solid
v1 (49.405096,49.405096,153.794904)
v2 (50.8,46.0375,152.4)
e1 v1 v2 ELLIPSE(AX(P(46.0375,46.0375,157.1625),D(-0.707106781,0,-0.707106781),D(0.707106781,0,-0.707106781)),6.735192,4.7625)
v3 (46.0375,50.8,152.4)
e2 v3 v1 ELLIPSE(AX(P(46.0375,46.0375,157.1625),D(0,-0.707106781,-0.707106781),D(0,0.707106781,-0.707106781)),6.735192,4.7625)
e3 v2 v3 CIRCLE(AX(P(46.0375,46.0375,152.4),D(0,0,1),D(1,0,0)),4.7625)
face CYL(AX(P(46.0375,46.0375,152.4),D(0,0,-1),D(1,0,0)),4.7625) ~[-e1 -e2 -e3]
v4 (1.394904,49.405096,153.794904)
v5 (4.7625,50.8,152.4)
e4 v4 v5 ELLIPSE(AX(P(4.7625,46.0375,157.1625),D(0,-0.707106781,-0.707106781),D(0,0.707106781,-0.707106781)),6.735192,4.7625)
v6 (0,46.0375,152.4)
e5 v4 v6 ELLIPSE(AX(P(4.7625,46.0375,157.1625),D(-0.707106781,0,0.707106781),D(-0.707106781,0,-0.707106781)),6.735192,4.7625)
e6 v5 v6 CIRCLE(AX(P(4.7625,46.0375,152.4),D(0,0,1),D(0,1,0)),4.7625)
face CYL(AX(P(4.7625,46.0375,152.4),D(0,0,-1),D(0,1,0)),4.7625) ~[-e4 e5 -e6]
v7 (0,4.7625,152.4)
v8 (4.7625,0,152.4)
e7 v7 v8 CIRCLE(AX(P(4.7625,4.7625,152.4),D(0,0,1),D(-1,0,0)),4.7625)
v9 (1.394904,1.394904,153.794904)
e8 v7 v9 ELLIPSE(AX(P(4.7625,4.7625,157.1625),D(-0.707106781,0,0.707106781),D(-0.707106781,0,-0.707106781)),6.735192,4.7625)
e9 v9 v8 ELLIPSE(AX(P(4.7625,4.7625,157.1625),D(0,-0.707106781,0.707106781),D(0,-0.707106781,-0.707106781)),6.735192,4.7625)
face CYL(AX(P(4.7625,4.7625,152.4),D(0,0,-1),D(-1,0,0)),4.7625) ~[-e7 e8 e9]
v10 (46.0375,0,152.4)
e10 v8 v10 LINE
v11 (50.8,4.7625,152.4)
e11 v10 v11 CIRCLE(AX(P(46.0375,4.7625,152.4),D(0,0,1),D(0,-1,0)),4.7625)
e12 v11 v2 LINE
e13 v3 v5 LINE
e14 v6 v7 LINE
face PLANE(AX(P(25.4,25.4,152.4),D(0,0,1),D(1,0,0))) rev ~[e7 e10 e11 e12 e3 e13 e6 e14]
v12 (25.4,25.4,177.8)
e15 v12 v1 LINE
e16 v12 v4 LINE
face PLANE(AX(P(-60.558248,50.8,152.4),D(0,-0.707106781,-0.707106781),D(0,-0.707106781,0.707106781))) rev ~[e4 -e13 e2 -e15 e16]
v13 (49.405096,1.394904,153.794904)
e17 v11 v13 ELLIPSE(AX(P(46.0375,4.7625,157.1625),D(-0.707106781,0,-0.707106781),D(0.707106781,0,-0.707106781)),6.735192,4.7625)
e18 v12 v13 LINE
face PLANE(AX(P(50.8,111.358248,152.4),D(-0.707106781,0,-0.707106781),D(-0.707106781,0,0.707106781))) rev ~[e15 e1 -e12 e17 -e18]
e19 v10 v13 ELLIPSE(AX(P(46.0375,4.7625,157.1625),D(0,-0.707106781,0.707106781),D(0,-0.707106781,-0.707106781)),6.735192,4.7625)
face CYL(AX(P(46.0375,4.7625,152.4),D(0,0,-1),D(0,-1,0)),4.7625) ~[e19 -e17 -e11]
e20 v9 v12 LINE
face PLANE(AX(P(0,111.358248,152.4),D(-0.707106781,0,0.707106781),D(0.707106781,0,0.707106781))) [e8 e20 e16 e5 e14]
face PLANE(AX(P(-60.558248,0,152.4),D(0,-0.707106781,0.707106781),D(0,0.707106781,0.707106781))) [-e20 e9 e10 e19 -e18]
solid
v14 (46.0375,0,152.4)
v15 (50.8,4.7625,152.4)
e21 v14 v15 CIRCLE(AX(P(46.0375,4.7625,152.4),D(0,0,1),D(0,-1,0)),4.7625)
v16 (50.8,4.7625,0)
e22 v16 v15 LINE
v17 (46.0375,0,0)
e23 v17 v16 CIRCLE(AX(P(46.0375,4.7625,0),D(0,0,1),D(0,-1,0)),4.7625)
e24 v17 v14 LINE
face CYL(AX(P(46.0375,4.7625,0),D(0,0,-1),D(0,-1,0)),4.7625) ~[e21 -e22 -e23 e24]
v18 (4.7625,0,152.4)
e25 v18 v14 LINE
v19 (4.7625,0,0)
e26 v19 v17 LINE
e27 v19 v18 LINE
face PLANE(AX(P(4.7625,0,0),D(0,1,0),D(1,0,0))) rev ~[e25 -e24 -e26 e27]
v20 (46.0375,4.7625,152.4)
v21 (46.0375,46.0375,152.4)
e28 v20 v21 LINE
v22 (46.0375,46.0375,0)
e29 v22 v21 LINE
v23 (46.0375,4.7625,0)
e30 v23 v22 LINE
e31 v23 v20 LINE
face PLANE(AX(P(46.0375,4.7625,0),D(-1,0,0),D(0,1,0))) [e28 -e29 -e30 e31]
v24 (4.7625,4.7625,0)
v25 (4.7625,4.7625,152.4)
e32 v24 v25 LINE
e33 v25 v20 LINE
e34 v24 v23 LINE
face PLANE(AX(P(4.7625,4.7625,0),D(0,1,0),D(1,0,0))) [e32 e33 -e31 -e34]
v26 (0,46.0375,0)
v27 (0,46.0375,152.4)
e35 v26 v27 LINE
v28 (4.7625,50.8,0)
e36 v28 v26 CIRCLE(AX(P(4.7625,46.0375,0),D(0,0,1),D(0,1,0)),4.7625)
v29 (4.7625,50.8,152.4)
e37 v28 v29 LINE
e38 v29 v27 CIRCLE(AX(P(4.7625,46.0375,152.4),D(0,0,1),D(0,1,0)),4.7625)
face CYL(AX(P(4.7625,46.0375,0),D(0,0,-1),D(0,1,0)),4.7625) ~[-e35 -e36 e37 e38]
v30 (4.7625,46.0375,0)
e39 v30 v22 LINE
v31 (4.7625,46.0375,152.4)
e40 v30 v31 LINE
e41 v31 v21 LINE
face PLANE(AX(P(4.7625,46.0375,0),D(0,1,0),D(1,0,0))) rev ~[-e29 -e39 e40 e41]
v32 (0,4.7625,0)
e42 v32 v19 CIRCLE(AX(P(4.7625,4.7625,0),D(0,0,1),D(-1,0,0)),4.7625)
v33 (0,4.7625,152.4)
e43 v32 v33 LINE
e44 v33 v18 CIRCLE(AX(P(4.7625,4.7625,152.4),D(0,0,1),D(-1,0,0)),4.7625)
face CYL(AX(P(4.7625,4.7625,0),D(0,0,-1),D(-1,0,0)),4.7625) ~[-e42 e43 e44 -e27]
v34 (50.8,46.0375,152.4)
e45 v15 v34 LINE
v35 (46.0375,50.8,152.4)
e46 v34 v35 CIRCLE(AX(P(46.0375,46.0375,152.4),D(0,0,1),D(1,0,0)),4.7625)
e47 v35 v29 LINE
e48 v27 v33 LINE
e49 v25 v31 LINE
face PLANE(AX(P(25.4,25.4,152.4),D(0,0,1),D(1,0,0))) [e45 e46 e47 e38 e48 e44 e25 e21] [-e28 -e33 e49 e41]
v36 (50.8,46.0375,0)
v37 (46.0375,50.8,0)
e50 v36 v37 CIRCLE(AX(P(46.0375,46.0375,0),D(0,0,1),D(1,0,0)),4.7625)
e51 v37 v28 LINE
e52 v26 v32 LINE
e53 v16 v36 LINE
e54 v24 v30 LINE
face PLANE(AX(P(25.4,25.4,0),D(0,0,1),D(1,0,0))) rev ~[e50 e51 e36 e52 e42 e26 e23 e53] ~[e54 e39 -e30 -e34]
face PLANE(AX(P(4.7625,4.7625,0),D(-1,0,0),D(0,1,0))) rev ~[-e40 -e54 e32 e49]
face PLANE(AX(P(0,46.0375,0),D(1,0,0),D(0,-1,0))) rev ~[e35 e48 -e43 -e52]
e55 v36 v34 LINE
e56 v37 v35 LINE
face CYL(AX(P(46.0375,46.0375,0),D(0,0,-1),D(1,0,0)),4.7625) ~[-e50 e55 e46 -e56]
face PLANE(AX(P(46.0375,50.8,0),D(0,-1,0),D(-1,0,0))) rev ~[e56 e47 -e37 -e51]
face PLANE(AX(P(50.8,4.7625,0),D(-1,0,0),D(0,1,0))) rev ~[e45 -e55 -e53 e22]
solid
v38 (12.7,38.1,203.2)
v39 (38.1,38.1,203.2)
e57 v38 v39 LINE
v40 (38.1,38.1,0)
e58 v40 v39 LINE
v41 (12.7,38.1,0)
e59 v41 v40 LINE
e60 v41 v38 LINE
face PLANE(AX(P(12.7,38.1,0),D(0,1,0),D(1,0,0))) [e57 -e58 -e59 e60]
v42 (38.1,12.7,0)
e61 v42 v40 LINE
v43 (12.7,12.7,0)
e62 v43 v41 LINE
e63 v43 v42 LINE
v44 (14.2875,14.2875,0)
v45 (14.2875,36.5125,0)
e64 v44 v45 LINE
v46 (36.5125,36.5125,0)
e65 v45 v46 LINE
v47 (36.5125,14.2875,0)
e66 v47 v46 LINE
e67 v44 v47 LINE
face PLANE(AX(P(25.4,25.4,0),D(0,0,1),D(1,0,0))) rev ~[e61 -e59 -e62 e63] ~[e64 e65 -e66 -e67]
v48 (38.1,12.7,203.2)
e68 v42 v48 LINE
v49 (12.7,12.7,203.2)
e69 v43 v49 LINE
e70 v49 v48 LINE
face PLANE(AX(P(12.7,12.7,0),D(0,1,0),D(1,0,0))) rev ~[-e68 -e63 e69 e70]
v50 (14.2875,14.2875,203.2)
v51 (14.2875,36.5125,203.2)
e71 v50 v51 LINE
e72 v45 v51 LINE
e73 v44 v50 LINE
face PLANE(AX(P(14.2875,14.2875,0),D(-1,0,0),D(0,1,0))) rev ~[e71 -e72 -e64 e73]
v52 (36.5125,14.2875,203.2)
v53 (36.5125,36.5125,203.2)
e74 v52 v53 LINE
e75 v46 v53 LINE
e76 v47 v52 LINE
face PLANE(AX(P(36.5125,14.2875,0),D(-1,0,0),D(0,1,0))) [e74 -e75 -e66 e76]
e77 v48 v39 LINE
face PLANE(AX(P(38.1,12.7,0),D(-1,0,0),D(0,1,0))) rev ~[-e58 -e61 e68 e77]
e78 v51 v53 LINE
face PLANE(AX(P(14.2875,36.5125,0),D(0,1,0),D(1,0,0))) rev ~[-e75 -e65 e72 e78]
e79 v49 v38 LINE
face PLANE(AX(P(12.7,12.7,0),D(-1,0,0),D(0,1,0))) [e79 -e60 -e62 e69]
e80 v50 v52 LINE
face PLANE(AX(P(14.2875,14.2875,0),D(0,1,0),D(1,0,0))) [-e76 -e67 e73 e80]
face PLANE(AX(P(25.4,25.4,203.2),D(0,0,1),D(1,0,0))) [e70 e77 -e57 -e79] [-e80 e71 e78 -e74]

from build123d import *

# Parameters (mm, degrees)
F0_W         = 41.275
F0_H         = 41.275
F1_DEPTH     = 152.4
F3_W         = 41.275
F3_H         = 41.275
F4_DEPTH     = 25.4
F5_T1_DEPTH  = 171.9164957887
F5_T3_DEPTH  = 171.9164957887
F5_T8_ANGLE  = 90
F5_T13_ANGLE = 90
F5_T18_ANGLE = 90
F5_T23_ANGLE = 90
F5_T28_ANGLE = 90
F5_T33_ANGLE = 90
F5_T38_ANGLE = 90
F5_T43_ANGLE = 90
F2_W         = 25.4
F2_H         = 25.4
F2_W_2       = 22.225
F2_H_2       = 22.225
F6_DEPTH     = 203.2


# Not quite as in the source:
# - a fillet or chamfer that OpenCascade refuses, or shapes differently, is made with other operations: its cross-section is extruded or revolved along the edge and cut away or added


with BuildPart() as f1:
    # F0 (on Top) → F1 (new body)
    with BuildSketch(Plane.XY):
        with BuildLine():
            ThreePointArc((0, 4.7625), (1.3949039546, 1.3949039546), (4.7625, 0))
            Line((4.7625, 0), (46.0375, 0))
            ThreePointArc((46.0375, 0), (49.4050960454, 1.3949039546), (50.8, 4.7625))
            Line((50.8, 4.7625), (50.8, 46.0375))
            ThreePointArc((50.8, 46.0375), (49.4050960454, 49.4050960454), (46.0375, 50.8))
            Line((46.0375, 50.8), (4.7625, 50.8))
            ThreePointArc((4.7625, 50.8), (1.3949039546, 49.4050960454), (0, 46.0375))
            Line((0, 46.0375), (0, 4.7625))
        make_face()
        with Locations((25.4, 25.4)):
            Rectangle(F0_W, F0_H, mode=Mode.SUBTRACT)
    extrude(amount=F1_DEPTH)


with BuildPart() as f4:
    # F3 (on face) → F4 (new body)
    with BuildSketch(Plane.XY.offset(152.4)):
        with BuildLine():
            ThreePointArc((0, 4.7625), (1.3949039546, 1.3949039546), (4.7625, 0))
            Line((4.7625, 0), (46.0375, 0))
            ThreePointArc((46.0375, 0), (49.4050960454, 1.3949039546), (50.8, 4.7625))
            Line((50.8, 4.7625), (50.8, 46.0375))
            ThreePointArc((50.8, 46.0375), (49.4050960454, 49.4050960454), (46.0375, 50.8))
            Line((46.0375, 50.8), (4.7625, 50.8))
            ThreePointArc((4.7625, 50.8), (1.3949039546, 49.4050960454), (0, 46.0375))
            Line((0, 46.0375), (0, 4.7625))
        make_face()
        with Locations((25.4, 25.4)):
            Rectangle(F3_W, F3_H, mode=Mode.SUBTRACT)
        with Locations((25.4, 25.4)):
            Rectangle(F3_W, F3_H)
    extrude(amount=F4_DEPTH)

    # F5: chamfer of 25.4 on 4 edges, made by hand

    # F5_s2 → F5_t1 (cut)
    with BuildSketch(Plane.XZ.offset(-111.3582478943)):
        Polygon((50.8, 152.4), (25.4, 177.8), (50.8, 177.8), align=None)
        Polygon((0, 152.4), (25.4, 177.8), (0, 177.8), align=None)
    extrude(amount=F5_T1_DEPTH, mode=Mode.SUBTRACT)

    # F5_s4 → F5_t3 (cut)
    with BuildSketch(Plane.YZ.offset(-60.5582478943)):
        Polygon((50.8, 152.4), (25.4, 177.8), (50.8, 177.8), align=None)
        Polygon((0, 152.4), (25.4, 177.8), (0, 177.8), align=None)
    extrude(amount=F5_T3_DEPTH, mode=Mode.SUBTRACT)


with BuildPart() as f5_tool6:
    # F5_s7 → F5_t8 (revolve)
    with BuildSketch(Plane.YZ.offset(4.7625)):
        Polygon((50.8, 152.4), (46.0375, 157.1625), (46.0375, 177.8), (50.8, 177.8), align=None)
    revolve(axis=Axis((4.7625, 46.0375, 177.8), (0, 0, 1)), revolution_arc=F5_T8_ANGLE)

    split(bisect_by=Plane(origin=(0, 101.6, 101.6), x_dir=(1, 0, 0), z_dir=(0, 0.7071067812, 0.7071067812)), keep=Keep.TOP)


with BuildPart() as f4_1:
    add(f4.part)

    # F5_t5: cut F5_tool6
    add(f5_tool6.part, mode=Mode.SUBTRACT)


with BuildPart() as f5_tool11:
    # F5_s12 → F5_t13 (revolve)
    with BuildSketch(Plane.YZ.offset(4.7625)):
        Polygon((50.8, 152.4), (46.0375, 157.1625), (46.0375, 177.8), (50.8, 177.8), align=None)
    revolve(axis=Axis((4.7625, 46.0375, 177.8), (0, 0, 1)), revolution_arc=F5_T13_ANGLE)

    split(bisect_by=Plane(origin=(-76.2, 0, 76.2), x_dir=(0, 1, 0), z_dir=(-0.7071067812, 0, 0.7071067812)), keep=Keep.TOP)


with BuildPart() as f4_2:
    add(f4_1.part)

    # F5_t10: cut F5_tool11
    add(f5_tool11.part, mode=Mode.SUBTRACT)


with BuildPart() as f5_tool16:
    # F5_s17 → F5_t18 (revolve)
    with BuildSketch(Plane.XZ.offset(-4.7625)):
        Polygon((0, 152.4), (4.7625, 157.1625), (4.7625, 177.8), (0, 177.8), align=None)
    revolve(axis=Axis((4.7625, 4.7625, 177.8), (0, 0, 1)), revolution_arc=F5_T18_ANGLE)

    split(bisect_by=Plane(origin=(-76.2, 0, 76.2), x_dir=(0, 1, 0), z_dir=(-0.7071067812, 0, 0.7071067812)), keep=Keep.TOP)


with BuildPart() as f4_3:
    add(f4_2.part)

    # F5_t15: cut F5_tool16
    add(f5_tool16.part, mode=Mode.SUBTRACT)


with BuildPart() as f5_tool21:
    # F5_s22 → F5_t23 (revolve)
    with BuildSketch(Plane.XZ.offset(-4.7625)):
        Polygon((0, 152.4), (4.7625, 157.1625), (4.7625, 177.8), (0, 177.8), align=None)
    revolve(axis=Axis((4.7625, 4.7625, 177.8), (0, 0, 1)), revolution_arc=F5_T23_ANGLE)

    split(bisect_by=Plane(origin=(0, -76.2, 76.2), x_dir=(1, 0, 0), z_dir=(0, -0.7071067812, 0.7071067812)), keep=Keep.TOP)


with BuildPart() as f4_4:
    add(f4_3.part)

    # F5_t20: cut F5_tool21
    add(f5_tool21.part, mode=Mode.SUBTRACT)


with BuildPart() as f5_tool26:
    # F5_s27 → F5_t28 (revolve)
    with BuildSketch(Plane.YZ.offset(46.0375)):
        Polygon((0, 152.4), (4.7625, 157.1625), (4.7625, 177.8), (0, 177.8), align=None)
    revolve(axis=Axis((46.0375, 4.7625, 177.8), (0, 0, 1)), revolution_arc=F5_T28_ANGLE)

    split(bisect_by=Plane(origin=(0, -76.2, 76.2), x_dir=(1, 0, 0), z_dir=(0, -0.7071067812, 0.7071067812)), keep=Keep.TOP)


with BuildPart() as f4_5:
    add(f4_4.part)

    # F5_t25: cut F5_tool26
    add(f5_tool26.part, mode=Mode.SUBTRACT)


with BuildPart() as f5_tool31:
    # F5_s32 → F5_t33 (revolve)
    with BuildSketch(Plane.YZ.offset(46.0375)):
        Polygon((0, 152.4), (4.7625, 157.1625), (4.7625, 177.8), (0, 177.8), align=None)
    revolve(axis=Axis((46.0375, 4.7625, 177.8), (0, 0, 1)), revolution_arc=F5_T33_ANGLE)

    split(bisect_by=Plane(origin=(101.6, 0, 101.6), x_dir=(0, 1, 0), z_dir=(0.7071067812, 0, 0.7071067812)), keep=Keep.TOP)


with BuildPart() as f4_6:
    add(f4_5.part)

    # F5_t30: cut F5_tool31
    add(f5_tool31.part, mode=Mode.SUBTRACT)


with BuildPart() as f5_tool36:
    # F5_s37 → F5_t38 (revolve)
    with BuildSketch(Plane.XZ.offset(-46.0375)):
        Polygon((50.8, 152.4), (46.0375, 157.1625), (46.0375, 177.8), (50.8, 177.8), align=None)
    revolve(axis=Axis((46.0375, 46.0375, 177.8), (0, 0, 1)), revolution_arc=F5_T38_ANGLE)

    split(bisect_by=Plane(origin=(101.6, 0, 101.6), x_dir=(0, 1, 0), z_dir=(0.7071067812, 0, 0.7071067812)), keep=Keep.TOP)


with BuildPart() as f4_7:
    add(f4_6.part)

    # F5_t35: cut F5_tool36
    add(f5_tool36.part, mode=Mode.SUBTRACT)


with BuildPart() as f5_tool41:
    # F5_s42 → F5_t43 (revolve)
    with BuildSketch(Plane.XZ.offset(-46.0375)):
        Polygon((50.8, 152.4), (46.0375, 157.1625), (46.0375, 177.8), (50.8, 177.8), align=None)
    revolve(axis=Axis((46.0375, 46.0375, 177.8), (0, 0, 1)), revolution_arc=F5_T43_ANGLE)

    split(bisect_by=Plane(origin=(0, 101.6, 101.6), x_dir=(1, 0, 0), z_dir=(0, 0.7071067812, 0.7071067812)), keep=Keep.TOP)


with BuildPart() as f4_8:
    add(f4_7.part)

    # F5_t40: cut F5_tool41
    add(f5_tool41.part, mode=Mode.SUBTRACT)


with BuildPart() as f6:
    # F2 (on Top) → F6 (new body)
    with BuildSketch(Plane.XY):
        with Locations((25.4, 25.4)):
            Rectangle(F2_W, F2_H)
        with Locations((25.4, 25.4)):
            Rectangle(F2_W_2, F2_H_2, mode=Mode.SUBTRACT)
    extrude(amount=F6_DEPTH)


solid = Compound([f1.part, f4_8.part, f6.part])
